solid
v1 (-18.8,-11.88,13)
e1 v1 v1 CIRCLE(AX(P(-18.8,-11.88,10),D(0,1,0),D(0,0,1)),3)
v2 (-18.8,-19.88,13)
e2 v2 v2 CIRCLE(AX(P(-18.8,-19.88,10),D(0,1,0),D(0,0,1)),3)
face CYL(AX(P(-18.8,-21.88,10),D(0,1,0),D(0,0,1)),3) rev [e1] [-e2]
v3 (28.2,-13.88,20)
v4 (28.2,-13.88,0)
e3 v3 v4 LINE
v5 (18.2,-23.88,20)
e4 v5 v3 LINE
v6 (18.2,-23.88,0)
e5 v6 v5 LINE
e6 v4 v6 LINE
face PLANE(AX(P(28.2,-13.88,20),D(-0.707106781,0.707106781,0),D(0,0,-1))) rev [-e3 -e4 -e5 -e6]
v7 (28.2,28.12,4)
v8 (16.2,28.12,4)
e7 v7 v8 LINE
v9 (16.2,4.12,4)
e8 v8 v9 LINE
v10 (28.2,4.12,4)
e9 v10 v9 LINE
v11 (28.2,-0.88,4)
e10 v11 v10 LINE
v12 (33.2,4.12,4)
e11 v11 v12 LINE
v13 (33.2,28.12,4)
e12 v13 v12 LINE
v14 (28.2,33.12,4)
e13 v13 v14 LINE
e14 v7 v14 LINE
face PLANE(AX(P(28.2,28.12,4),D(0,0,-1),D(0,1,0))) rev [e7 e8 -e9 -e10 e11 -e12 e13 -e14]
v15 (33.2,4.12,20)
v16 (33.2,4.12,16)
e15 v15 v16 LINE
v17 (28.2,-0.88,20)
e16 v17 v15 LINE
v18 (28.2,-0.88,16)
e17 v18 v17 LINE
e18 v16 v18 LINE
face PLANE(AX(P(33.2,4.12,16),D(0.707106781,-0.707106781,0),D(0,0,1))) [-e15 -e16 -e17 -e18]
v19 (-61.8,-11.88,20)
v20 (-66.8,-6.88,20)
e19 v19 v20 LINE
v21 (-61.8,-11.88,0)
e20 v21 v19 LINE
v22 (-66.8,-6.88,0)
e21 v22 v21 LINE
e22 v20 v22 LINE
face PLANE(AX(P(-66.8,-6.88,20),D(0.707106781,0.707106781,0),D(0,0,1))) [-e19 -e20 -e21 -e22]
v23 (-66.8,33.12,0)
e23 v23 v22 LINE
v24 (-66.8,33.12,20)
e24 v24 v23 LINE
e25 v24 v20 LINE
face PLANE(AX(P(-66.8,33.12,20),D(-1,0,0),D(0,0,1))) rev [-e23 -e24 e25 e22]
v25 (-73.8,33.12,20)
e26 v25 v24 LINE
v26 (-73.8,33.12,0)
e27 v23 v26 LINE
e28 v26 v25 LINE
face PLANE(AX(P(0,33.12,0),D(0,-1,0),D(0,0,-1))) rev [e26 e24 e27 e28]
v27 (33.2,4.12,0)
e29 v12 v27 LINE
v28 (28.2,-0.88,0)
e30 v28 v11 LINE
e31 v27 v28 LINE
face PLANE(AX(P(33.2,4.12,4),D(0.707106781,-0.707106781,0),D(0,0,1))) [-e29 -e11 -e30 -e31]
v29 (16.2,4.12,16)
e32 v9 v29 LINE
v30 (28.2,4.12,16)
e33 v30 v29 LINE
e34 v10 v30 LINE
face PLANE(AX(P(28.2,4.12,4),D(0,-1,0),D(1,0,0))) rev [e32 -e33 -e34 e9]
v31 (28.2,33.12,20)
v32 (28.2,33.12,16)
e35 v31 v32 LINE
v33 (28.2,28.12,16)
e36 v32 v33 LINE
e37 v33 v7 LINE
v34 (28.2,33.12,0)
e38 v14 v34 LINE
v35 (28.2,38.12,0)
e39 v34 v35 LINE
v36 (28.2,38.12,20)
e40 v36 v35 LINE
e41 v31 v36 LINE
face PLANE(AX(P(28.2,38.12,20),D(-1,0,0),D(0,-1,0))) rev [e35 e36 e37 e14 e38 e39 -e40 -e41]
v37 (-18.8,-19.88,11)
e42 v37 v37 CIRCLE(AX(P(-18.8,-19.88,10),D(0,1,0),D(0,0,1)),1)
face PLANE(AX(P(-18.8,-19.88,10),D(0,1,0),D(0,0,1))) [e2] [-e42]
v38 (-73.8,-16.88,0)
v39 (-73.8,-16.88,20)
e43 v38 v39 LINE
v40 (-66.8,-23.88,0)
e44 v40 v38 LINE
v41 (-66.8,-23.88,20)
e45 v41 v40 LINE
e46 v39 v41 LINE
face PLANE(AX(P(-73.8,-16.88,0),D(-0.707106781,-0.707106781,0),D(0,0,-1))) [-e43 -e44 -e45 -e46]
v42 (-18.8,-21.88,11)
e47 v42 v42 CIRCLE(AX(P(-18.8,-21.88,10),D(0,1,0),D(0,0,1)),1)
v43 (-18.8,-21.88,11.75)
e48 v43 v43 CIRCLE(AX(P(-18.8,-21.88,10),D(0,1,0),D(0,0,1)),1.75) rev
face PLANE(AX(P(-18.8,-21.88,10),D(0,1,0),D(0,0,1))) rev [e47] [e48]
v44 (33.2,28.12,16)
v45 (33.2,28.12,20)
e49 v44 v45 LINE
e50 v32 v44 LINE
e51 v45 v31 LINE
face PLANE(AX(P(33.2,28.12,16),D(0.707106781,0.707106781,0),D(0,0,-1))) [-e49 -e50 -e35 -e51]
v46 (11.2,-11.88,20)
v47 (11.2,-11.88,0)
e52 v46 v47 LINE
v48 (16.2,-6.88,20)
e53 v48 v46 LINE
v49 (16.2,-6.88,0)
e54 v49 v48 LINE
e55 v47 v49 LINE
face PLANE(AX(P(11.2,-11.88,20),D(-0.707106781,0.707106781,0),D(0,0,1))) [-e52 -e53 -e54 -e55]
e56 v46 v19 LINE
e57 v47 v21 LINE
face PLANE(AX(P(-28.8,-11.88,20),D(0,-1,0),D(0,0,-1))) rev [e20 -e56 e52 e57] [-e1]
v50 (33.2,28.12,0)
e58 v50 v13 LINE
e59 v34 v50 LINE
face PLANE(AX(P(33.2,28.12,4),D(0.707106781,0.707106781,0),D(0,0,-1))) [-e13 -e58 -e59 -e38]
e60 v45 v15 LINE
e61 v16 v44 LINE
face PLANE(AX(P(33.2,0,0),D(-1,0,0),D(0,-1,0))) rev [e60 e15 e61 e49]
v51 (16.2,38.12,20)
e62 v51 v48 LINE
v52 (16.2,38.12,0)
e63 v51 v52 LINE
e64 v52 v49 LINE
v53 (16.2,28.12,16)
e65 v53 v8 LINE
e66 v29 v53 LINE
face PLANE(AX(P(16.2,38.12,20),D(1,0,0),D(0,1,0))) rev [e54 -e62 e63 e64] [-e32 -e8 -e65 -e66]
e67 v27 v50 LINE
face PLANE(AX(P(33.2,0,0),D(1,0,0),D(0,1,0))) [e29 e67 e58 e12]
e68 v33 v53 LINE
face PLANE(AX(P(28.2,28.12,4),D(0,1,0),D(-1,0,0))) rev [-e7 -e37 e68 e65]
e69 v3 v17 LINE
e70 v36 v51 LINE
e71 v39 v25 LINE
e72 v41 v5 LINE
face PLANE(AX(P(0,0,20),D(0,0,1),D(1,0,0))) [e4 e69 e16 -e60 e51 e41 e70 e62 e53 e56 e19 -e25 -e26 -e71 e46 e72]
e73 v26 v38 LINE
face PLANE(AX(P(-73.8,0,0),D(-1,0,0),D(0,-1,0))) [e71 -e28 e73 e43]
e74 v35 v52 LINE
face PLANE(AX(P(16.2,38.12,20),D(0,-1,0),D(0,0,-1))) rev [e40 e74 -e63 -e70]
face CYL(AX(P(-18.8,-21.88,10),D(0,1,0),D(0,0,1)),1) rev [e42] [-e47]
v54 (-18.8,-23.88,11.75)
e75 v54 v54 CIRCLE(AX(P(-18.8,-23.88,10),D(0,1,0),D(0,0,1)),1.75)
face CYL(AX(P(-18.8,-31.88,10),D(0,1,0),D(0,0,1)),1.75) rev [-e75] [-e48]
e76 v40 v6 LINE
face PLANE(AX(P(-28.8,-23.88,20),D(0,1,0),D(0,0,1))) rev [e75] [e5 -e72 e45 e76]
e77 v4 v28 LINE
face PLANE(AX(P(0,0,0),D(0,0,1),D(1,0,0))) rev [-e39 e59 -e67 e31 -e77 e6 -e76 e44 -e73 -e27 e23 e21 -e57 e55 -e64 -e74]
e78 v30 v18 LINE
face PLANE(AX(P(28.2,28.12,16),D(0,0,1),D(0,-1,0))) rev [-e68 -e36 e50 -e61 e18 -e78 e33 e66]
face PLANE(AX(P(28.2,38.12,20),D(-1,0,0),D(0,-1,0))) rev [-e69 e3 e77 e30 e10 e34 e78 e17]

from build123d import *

# Parameters (mm, degrees)
BOSS_EXTRUDE1_DEPTH = 20
CHAMFER1_SIZE       = 5
CHAMFER2_SIZE       = 10
SKETCH2_R           = 1.75
CUT_EXTRUDE1_DEPTH  = 20
SKETCH3_R           = 3
CUT_EXTRUDE2_DEPTH  = 10
BOSS_EXTRUDE2_START = 2
SKETCH4_R           = 3
BOSS_EXTRUDE2_DEPTH = 2
SKETCH5_R           = 1
CUT_EXTRUDE3_DEPTH  = 2
SKETCH6_W           = 12
SKETCH6_H           = 24
CUT_EXTRUDE4_DEPTH  = 12
SKETCH7_W           = 4
SKETCH7_H           = 24
BOSS_EXTRUDE3_DEPTH = 5
CHAMFER3_SIZE       = 5
SKETCH8_W           = 20
SKETCH8_H           = 12
BOSS_EXTRUDE4_DEPTH = 45
SKETCH9_W           = 7
SKETCH9_H           = 20
BOSS_EXTRUDE5_DEPTH = 45
CHAMFER4_SIZE       = 5
CHAMFER5_SIZE       = 7


with BuildPart() as part:
    # Sketch1 → Boss-Extrude1 (new body)
    with BuildSketch(Plane.XY):
        Polygon((16.2, 38.12), (28.2, 38.12), (28.2, -23.88), (-28.8, -23.88), (-28.8, -11.88), (16.2, -11.88), align=None)
    extrude(amount=BOSS_EXTRUDE1_DEPTH)

    # Chamfer1
    chamfer1_edges = [part.edges().sort_by_distance(p)[0] for p in [
        (16.2, -11.88, 10),
    ]]
    chamfer(chamfer1_edges, length=CHAMFER1_SIZE)

    # Chamfer2
    chamfer2_edges = [part.edges().sort_by_distance(p)[0] for p in [
        (28.2, -23.88, 10),
    ]]
    chamfer(chamfer2_edges, length=CHAMFER2_SIZE)

    # Sketch2 → Cut-Extrude1 (cut)
    with BuildSketch(Plane(origin=(0, -11.88, 0), x_dir=(1, 0, 0), z_dir=(0, 1, 0))):
        with Locations(Location((-18.8, -10, 0), (0, 0, 270))):
            Circle(SKETCH2_R)
    extrude(amount=-CUT_EXTRUDE1_DEPTH, mode=Mode.SUBTRACT)

    # Sketch3 → Cut-Extrude2 (cut)
    with BuildSketch(Plane(origin=(0, -11.88, 0), x_dir=(1, 0, 0), z_dir=(0, 1, 0))):
        with Locations(Location((-18.8, -10, 0), (0, 0, 270))):
            Circle(SKETCH3_R)
    extrude(amount=-CUT_EXTRUDE2_DEPTH, mode=Mode.SUBTRACT)

    # Sketch4 → Boss-Extrude2 (add)
    with BuildSketch(Plane(origin=(0, -21.88, 0), x_dir=(1, 0, 0), z_dir=(0, 1, 0)).offset(BOSS_EXTRUDE2_START)):
        with Locations(Location((-18.8, -10, 0), (0, 0, 270))):
            Circle(SKETCH4_R)
    extrude(amount=-BOSS_EXTRUDE2_DEPTH)

    # Sketch5 → Cut-Extrude3 (cut)
    with BuildSketch(Plane(origin=(0, -19.88, 0), x_dir=(1, 0, 0), z_dir=(0, 1, 0))):
        with Locations(Location((-18.8, -10, 0), (0, 0, 270))):
            Circle(SKETCH5_R)
    extrude(amount=-CUT_EXTRUDE3_DEPTH, mode=Mode.SUBTRACT)

    # Sketch6 → Cut-Extrude4 (cut)
    with BuildSketch(Plane.ZY.offset(-16.2)):
        with Locations((10, 16.12)):
            Rectangle(SKETCH6_W, SKETCH6_H)
    extrude(amount=-CUT_EXTRUDE4_DEPTH, mode=Mode.SUBTRACT)

    # Sketch7 → Boss-Extrude3 (add)
    with BuildSketch(Plane(origin=(28.2, 0, 0), x_dir=(0, 0, -1), z_dir=(1, 0, 0))):
        with Locations((-18, 16.12)):
            Rectangle(SKETCH7_W, SKETCH7_H)
        with Locations((-2, 16.12)):
            Rectangle(SKETCH7_W, SKETCH7_H)
    extrude(amount=BOSS_EXTRUDE3_DEPTH)

    # Chamfer3
    chamfer3_edges = [part.edges().sort_by_distance(p)[0] for p in [
        (28.2, 4.12, 18),
        (28.2, 4.12, 2),
        (28.2, 28.12, 18),
        (28.2, 28.12, 2),
    ]]
    chamfer(chamfer3_edges, length=CHAMFER3_SIZE - 0.0001)  # a hair under: the kernel refuses the full size

    # Sketch8 → Boss-Extrude4 (add)
    with BuildSketch(Plane.ZY.offset(28.8)):
        with Locations((10, -17.88)):
            Rectangle(SKETCH8_W, SKETCH8_H)
    extrude(amount=BOSS_EXTRUDE4_DEPTH)

    # Sketch9 → Boss-Extrude5 (add)
    with BuildSketch(Plane(origin=(0, -11.88, 0), x_dir=(1, 0, 0), z_dir=(0, 1, 0))):
        with Locations((-70.3, -10)):
            Rectangle(SKETCH9_W, SKETCH9_H)
    extrude(amount=BOSS_EXTRUDE5_DEPTH)

    # Chamfer4
    chamfer4_edges = [part.edges().sort_by_distance(p)[0] for p in [
        (-66.8, -11.88, 10),
    ]]
    chamfer(chamfer4_edges, length=CHAMFER4_SIZE)

    # Chamfer5
    chamfer5_edges = [part.edges().sort_by_distance(p)[0] for p in [
        (-73.8, -23.88, 10),
    ]]
    chamfer(chamfer5_edges, length=CHAMFER5_SIZE)


solid = part.part
